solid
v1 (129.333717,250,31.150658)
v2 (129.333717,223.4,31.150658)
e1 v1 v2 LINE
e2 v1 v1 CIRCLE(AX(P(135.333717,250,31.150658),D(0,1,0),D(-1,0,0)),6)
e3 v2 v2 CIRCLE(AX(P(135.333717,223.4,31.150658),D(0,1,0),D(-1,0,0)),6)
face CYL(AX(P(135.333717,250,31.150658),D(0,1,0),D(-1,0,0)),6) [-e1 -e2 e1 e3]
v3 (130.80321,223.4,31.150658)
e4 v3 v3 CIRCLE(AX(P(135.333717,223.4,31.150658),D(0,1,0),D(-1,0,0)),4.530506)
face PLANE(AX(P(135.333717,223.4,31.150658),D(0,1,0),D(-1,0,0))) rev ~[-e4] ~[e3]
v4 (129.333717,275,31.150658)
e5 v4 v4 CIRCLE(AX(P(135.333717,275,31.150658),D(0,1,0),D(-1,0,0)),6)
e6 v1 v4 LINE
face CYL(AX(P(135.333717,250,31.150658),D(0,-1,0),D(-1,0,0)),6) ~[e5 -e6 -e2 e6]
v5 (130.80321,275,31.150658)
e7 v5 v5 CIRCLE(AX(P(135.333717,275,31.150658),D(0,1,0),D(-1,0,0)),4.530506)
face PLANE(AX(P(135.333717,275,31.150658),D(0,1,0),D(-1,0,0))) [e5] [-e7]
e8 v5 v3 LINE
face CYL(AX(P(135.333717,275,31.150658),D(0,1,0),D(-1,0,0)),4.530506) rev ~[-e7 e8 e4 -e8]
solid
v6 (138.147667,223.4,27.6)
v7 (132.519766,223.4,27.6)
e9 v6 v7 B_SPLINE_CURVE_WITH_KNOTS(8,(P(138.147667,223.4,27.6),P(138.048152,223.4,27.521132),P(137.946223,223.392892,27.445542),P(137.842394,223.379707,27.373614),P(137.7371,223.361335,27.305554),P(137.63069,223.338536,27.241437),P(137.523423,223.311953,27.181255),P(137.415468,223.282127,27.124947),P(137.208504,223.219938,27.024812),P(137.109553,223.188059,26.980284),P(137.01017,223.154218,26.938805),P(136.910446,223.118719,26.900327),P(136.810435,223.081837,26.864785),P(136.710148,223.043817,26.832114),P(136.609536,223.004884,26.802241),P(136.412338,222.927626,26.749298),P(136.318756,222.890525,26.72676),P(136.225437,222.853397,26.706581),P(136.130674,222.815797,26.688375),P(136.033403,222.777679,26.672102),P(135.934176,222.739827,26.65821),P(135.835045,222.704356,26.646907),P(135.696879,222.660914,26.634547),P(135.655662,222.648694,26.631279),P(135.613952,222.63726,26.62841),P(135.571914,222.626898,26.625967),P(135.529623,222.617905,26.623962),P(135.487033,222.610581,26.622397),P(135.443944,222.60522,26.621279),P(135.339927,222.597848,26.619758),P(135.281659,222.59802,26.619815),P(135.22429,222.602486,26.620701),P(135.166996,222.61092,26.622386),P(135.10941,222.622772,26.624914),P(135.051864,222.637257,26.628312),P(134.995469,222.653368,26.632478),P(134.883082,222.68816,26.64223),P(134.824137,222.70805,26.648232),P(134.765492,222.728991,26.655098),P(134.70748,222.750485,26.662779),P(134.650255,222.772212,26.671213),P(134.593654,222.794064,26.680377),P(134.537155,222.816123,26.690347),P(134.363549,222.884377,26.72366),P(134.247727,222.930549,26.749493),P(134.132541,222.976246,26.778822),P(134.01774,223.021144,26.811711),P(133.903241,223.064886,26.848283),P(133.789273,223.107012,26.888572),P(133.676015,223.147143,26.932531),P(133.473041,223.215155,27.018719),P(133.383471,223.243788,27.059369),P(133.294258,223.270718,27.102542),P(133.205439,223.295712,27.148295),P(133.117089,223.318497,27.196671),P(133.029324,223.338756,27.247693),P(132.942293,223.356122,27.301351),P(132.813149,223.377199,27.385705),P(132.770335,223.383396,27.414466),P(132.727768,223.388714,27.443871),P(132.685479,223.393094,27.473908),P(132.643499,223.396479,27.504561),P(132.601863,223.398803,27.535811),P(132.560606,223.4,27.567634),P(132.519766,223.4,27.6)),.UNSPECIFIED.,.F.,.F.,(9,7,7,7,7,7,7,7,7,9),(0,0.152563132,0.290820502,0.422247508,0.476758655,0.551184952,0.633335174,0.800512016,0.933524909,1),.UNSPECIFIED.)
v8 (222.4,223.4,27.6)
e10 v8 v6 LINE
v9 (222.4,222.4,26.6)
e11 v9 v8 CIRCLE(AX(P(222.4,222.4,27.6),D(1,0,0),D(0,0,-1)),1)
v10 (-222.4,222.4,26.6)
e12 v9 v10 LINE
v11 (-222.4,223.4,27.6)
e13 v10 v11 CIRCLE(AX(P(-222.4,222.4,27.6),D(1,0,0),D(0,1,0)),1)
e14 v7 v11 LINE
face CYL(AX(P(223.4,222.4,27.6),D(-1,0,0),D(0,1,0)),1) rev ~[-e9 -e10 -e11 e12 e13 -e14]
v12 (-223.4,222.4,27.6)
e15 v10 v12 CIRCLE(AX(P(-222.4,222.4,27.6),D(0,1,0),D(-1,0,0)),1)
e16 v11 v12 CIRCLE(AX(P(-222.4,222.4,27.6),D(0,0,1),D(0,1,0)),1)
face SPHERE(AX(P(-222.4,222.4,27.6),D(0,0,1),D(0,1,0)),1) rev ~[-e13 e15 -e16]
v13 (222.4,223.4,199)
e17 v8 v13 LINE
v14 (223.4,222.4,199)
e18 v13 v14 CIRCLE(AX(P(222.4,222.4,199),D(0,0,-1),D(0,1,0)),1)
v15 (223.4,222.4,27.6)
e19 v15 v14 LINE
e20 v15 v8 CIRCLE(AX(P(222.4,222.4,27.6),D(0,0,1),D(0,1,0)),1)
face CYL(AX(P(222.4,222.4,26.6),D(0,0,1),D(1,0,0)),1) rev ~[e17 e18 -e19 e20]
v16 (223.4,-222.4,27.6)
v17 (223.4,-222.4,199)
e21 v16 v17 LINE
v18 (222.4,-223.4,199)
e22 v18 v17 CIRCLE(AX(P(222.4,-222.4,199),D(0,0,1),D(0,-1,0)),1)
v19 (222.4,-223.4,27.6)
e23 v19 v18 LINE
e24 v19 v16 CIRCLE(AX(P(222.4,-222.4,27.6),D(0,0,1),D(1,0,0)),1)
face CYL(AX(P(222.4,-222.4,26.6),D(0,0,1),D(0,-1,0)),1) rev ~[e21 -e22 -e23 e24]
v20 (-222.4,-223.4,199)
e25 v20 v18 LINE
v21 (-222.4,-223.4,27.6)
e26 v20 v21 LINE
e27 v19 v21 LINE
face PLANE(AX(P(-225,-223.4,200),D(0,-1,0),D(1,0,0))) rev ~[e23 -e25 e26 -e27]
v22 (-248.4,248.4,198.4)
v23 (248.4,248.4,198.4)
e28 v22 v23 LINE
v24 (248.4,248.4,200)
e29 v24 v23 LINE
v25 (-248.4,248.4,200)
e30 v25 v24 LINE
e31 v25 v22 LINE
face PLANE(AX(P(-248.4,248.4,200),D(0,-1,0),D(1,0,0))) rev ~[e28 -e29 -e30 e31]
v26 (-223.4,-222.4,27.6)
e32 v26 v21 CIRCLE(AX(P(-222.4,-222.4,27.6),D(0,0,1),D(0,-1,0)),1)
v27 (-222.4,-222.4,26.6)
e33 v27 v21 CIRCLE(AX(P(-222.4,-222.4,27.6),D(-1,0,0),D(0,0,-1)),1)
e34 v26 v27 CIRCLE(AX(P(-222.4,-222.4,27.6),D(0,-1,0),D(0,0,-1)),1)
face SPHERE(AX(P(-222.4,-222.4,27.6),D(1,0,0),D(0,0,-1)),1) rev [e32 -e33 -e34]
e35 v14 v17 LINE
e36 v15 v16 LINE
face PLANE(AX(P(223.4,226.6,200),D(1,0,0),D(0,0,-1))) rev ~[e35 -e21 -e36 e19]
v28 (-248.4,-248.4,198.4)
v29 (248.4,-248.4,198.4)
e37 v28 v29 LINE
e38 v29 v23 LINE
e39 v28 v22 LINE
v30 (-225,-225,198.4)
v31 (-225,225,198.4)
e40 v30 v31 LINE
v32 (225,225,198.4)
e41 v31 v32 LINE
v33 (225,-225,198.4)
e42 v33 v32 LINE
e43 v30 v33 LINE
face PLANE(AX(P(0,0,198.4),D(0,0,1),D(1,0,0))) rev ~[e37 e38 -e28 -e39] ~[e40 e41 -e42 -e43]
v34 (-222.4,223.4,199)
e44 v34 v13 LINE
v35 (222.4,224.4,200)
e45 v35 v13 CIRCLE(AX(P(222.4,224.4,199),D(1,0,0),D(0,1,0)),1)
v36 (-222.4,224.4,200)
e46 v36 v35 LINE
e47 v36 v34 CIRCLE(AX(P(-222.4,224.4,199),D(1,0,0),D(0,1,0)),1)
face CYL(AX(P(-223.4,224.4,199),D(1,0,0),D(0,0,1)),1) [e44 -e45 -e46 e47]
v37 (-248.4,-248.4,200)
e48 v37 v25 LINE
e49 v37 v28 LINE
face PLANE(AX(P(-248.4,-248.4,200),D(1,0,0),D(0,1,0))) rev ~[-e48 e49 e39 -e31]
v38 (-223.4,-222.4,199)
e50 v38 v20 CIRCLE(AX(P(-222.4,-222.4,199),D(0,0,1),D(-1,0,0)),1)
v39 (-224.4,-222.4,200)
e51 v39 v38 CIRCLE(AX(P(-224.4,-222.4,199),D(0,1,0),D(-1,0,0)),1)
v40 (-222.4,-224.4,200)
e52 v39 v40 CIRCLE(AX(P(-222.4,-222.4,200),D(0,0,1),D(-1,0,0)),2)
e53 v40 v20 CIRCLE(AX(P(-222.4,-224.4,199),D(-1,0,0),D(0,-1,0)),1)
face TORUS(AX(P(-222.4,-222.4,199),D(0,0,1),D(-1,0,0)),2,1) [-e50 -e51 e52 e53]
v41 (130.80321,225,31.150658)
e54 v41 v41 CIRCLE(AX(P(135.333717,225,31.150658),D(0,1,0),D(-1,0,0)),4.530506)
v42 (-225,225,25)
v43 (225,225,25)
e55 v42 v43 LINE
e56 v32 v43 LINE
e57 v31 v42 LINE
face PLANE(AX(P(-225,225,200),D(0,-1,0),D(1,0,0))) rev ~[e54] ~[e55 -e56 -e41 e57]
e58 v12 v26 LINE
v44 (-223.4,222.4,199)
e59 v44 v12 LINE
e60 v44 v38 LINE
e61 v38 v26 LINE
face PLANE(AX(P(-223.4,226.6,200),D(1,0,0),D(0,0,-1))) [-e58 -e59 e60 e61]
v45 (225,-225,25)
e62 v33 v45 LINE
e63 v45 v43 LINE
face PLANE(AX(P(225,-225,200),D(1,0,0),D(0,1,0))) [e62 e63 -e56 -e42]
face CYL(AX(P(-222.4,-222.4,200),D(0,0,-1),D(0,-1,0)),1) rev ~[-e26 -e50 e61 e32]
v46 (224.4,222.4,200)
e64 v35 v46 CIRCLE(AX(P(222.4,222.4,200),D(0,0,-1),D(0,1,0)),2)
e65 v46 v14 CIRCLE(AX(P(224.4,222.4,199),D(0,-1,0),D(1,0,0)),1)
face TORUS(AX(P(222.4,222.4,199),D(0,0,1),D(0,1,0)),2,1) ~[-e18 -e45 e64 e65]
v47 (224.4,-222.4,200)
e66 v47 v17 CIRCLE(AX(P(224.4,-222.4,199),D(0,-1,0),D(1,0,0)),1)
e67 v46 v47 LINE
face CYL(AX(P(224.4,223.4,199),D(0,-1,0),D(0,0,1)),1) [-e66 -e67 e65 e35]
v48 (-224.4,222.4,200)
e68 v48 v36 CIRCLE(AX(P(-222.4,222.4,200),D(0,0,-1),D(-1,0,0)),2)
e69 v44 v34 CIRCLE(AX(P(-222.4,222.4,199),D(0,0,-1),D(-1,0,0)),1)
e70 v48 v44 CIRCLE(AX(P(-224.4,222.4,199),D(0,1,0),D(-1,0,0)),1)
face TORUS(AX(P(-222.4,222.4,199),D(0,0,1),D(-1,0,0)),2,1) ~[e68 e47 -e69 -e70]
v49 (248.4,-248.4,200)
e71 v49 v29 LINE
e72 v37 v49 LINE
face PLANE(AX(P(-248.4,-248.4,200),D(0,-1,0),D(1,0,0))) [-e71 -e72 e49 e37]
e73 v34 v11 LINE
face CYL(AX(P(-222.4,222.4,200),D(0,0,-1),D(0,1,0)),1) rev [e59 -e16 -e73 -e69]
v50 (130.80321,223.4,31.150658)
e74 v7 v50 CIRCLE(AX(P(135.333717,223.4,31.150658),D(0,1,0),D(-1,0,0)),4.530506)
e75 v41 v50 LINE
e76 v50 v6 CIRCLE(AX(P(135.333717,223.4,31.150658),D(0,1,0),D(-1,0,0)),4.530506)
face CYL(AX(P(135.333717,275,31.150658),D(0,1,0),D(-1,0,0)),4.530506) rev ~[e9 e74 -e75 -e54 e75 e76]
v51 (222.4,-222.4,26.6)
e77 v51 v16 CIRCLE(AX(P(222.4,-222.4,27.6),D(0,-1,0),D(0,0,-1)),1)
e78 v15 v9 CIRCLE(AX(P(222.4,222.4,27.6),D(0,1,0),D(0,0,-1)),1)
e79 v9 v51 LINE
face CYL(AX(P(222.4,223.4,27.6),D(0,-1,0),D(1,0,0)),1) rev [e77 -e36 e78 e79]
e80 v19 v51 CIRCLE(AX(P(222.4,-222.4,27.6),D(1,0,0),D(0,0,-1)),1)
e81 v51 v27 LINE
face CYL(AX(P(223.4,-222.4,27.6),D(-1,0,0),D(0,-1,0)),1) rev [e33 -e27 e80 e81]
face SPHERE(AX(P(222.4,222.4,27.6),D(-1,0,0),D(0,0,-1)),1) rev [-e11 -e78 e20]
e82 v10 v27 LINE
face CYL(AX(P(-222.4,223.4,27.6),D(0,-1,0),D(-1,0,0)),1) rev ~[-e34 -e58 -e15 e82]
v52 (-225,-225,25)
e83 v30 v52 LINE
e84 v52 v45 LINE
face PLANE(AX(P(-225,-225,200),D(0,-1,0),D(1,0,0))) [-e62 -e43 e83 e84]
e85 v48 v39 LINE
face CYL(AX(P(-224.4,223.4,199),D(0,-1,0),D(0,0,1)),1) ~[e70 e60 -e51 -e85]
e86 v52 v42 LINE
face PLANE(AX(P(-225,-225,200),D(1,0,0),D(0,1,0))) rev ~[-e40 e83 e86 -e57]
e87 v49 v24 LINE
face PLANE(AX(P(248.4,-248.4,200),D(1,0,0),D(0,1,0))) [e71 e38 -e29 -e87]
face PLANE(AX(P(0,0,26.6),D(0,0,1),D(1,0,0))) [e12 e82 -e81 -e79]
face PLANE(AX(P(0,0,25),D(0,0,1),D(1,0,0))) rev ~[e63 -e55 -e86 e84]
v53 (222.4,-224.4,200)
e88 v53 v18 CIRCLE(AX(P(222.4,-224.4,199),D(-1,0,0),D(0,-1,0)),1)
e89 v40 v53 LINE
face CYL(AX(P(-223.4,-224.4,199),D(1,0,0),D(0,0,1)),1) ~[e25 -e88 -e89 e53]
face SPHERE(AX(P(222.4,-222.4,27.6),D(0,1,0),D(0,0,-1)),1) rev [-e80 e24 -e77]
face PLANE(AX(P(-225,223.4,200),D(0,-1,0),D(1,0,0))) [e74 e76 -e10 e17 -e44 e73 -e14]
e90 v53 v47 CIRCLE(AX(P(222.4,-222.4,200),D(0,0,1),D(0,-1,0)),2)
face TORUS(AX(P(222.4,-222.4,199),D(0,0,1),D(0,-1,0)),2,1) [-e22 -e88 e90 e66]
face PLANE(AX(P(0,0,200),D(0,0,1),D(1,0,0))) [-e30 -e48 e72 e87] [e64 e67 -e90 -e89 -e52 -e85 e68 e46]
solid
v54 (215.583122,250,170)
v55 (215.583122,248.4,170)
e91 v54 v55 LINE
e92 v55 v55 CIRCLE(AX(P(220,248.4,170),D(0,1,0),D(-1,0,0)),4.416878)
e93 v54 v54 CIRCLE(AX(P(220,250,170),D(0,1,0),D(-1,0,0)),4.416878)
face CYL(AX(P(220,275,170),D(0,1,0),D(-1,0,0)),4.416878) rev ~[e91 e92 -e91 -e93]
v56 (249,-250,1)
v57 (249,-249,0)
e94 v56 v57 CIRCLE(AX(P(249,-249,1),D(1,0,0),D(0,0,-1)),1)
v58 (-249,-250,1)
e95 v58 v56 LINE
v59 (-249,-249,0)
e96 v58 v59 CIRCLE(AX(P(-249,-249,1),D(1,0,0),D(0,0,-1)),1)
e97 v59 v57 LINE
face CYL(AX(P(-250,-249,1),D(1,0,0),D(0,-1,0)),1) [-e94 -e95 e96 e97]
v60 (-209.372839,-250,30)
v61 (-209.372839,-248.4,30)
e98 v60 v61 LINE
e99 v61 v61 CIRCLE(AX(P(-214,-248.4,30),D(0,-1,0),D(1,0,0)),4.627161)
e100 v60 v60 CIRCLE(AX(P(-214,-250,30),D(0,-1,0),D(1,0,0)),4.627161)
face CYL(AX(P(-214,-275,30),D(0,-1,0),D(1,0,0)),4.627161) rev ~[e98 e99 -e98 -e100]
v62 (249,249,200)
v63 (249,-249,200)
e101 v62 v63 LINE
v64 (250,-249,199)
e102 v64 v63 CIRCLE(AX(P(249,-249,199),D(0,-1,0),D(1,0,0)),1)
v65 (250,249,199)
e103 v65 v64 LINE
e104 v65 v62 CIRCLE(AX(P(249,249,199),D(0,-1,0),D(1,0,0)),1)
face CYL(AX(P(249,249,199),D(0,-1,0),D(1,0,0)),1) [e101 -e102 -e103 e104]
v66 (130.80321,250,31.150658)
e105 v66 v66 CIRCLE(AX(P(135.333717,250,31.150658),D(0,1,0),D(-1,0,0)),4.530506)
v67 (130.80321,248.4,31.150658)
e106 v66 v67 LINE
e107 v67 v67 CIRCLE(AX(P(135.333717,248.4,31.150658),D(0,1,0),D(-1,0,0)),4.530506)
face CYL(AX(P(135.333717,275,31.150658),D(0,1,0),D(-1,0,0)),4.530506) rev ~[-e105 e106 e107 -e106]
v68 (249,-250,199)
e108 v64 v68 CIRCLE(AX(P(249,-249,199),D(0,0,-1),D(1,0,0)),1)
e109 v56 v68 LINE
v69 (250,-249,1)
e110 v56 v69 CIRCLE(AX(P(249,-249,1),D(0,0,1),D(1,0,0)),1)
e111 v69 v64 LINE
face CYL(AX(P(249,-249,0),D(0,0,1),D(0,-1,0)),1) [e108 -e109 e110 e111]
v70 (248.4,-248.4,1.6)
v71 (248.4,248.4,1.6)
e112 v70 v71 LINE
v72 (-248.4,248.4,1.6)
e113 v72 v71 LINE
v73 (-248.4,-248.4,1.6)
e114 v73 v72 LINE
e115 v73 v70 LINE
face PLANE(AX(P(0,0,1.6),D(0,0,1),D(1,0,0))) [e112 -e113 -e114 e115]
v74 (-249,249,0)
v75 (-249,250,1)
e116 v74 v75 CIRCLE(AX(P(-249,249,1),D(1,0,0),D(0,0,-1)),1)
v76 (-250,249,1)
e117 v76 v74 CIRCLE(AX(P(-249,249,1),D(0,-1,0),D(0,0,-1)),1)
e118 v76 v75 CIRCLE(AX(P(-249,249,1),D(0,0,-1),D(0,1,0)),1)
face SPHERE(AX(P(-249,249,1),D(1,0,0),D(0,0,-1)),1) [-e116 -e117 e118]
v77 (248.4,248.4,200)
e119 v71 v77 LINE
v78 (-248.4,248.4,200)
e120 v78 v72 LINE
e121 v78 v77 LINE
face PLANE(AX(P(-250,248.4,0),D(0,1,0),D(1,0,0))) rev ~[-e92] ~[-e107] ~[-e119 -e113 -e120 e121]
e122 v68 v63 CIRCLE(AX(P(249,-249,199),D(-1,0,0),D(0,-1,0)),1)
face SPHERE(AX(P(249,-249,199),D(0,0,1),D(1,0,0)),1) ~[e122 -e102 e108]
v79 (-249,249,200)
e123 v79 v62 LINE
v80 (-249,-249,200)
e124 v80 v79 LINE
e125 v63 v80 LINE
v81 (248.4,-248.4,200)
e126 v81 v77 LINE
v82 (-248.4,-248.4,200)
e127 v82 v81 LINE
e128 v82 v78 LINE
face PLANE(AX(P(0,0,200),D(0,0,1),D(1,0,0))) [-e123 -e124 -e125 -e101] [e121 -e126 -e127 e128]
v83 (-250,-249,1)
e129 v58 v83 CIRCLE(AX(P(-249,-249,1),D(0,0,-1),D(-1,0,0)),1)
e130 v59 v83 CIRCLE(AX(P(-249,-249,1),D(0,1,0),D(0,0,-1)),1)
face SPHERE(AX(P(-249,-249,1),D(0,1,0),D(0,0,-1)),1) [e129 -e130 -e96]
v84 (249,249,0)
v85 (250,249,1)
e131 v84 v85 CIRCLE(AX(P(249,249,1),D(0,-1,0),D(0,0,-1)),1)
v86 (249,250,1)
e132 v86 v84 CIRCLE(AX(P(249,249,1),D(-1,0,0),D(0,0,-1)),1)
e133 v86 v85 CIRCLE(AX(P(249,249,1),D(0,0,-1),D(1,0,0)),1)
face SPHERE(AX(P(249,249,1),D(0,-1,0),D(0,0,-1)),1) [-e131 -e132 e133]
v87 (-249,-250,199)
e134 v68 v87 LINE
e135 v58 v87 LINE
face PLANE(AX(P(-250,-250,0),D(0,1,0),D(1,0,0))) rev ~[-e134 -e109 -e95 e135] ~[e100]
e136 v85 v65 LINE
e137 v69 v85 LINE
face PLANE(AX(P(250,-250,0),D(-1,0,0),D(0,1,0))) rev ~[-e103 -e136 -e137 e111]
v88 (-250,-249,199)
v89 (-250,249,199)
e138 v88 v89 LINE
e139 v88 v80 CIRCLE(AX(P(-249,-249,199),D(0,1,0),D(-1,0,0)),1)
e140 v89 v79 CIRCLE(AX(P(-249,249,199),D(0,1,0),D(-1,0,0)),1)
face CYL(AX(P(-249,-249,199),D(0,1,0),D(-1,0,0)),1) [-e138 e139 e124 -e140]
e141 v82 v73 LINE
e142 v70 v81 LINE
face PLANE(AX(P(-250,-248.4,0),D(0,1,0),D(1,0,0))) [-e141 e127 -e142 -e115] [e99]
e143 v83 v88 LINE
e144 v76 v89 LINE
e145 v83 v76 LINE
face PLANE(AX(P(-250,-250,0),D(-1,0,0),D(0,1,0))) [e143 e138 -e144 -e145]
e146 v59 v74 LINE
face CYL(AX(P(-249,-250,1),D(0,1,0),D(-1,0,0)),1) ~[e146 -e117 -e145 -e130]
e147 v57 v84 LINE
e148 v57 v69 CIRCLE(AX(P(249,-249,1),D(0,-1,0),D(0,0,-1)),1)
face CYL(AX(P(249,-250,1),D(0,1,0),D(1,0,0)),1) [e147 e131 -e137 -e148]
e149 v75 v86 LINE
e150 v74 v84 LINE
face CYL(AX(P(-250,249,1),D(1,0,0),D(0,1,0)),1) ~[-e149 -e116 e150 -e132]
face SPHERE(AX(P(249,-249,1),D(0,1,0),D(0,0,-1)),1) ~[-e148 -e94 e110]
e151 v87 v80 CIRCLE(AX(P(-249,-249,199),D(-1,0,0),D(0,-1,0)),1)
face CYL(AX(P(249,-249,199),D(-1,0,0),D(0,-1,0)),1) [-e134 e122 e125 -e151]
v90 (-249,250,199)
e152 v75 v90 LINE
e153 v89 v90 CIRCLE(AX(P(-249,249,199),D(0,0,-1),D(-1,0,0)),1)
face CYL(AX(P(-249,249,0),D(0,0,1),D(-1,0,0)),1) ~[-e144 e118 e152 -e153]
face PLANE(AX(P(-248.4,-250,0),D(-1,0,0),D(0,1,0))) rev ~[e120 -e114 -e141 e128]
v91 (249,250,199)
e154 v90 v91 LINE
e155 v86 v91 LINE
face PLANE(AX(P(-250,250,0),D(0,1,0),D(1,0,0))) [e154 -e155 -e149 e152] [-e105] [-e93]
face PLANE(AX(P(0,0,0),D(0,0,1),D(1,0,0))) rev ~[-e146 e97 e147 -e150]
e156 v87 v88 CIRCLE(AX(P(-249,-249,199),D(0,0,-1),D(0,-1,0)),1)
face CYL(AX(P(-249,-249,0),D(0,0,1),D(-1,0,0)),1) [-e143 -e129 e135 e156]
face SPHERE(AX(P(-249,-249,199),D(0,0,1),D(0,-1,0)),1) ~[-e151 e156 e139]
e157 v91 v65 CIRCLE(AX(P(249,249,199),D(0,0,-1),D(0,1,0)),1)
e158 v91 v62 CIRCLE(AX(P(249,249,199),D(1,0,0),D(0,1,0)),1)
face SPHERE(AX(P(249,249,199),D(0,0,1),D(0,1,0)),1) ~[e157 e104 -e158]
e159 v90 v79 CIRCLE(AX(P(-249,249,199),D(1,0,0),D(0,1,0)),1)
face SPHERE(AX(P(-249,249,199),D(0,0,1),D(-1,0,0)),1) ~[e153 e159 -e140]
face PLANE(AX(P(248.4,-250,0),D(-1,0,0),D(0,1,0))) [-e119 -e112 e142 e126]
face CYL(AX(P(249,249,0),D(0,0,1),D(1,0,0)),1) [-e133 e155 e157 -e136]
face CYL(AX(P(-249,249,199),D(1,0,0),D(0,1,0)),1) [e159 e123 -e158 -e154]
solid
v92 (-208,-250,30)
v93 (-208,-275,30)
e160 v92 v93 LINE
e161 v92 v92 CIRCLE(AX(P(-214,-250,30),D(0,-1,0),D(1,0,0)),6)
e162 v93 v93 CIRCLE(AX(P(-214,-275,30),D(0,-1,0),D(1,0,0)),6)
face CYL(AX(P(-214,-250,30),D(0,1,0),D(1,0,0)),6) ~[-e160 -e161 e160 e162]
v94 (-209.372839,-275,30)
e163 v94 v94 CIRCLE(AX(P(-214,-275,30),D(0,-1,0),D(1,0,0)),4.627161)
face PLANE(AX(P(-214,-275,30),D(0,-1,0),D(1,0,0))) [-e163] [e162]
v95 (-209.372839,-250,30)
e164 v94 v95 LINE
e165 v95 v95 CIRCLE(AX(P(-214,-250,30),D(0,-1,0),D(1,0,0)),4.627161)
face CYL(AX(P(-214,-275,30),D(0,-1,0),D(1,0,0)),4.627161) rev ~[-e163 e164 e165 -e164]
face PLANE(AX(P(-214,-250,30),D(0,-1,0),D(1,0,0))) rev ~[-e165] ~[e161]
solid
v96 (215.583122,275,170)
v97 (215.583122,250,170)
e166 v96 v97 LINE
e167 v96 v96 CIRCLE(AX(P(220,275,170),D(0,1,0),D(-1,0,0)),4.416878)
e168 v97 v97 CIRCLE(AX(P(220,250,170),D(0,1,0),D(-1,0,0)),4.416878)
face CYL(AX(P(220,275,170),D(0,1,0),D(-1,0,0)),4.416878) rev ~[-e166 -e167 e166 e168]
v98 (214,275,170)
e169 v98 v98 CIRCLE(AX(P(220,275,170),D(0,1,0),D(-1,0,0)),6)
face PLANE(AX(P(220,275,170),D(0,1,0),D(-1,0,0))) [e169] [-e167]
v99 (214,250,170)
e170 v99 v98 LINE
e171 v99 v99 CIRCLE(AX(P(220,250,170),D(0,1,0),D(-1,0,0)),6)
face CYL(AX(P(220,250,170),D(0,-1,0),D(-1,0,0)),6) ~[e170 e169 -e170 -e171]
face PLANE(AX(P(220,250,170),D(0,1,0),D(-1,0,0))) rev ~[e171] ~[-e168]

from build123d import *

# Parameters (mm, degrees)
F0_W           = 500
F0_H           = 500
F1_DEPTH       = 200
F2_R           = 1
F3_T           = -1.6
F4_W           = 496.8
F4_H           = 496.8
F4_W_2         = 450
F4_H_2         = 450
F5_DEPTH       = 1.6
F6_W           = 450
F6_H           = 450
F7_DEPTH       = 175
F8_T           = 1.6
F8_T3_DEPTH    = 453.2
F8_T5_DEPTH    = 453.2
F9_R           = 1
F9_2_R         = 1
F10_R          = 6
F11_DEPTH      = 25
F12_R          = 6
F13_DEPTH      = 25
F14_R          = 4.6271608876
F15_DEPTH      = 30
F16_R          = 4.4168784141
F17_DEPTH      = 30
F18_R          = 6
F19_DEPTH      = 26.6
F19_DEPTH_BACK = 25
F20_R          = 4.5305063865
F21_DEPTH      = 70


# Not quite as in the source:
# - a shell that OpenCascade refuses in one call is made with other operations: the cavity is built on its own and cut out


with BuildPart() as f1:
    # F0 (on Top) → F1 (new body)
    with BuildSketch(Plane.XY):
        Rectangle(F0_W, F0_H)
    extrude(amount=F1_DEPTH)

    # F2
    f2_edges = [f1.edges().sort_by_distance(p)[0] for p in [
        (250, 0, 0),
        (0, 250, 0),
        (-250, 0, 0),
        (0, -250, 0),
        (250, -250, 100),
        (-250, -250, 100),
        (-250, 250, 100),
        (250, 250, 100),
    ]]
    fillet(f2_edges, radius=F2_R)

    # F3
    f3_openings = [f1.faces().sort_by_distance(p)[0] for p in [
        (0, 0, 200),
    ]]
    offset(amount=F3_T, openings=f3_openings)

    # F9#2
    f9_2_edges = [f1.edges().sort_by_distance(p)[0] for p in [
        (-250, 0, 200),
        (0, -250, 200),
        (250, 0, 200),
        (0, 250, 200),
    ]]
    fillet(f9_2_edges, radius=F9_2_R)


with BuildPart() as f5:
    # F4 (on face) → F5 (new body)
    with BuildSketch(Plane.XY.offset(200)):
        Rectangle(F4_W, F4_H)
        Rectangle(F4_W_2, F4_H_2, mode=Mode.SUBTRACT)
    extrude(amount=-F5_DEPTH)

    # F6 (on face) → F7 (join)
    with BuildSketch(Plane.XY.offset(200)):
        Rectangle(F6_W, F6_H)
    extrude(amount=-F7_DEPTH)

    # F8: shell of thickness 1.6, made by hand


with BuildPart() as f8_core1:
    # F8_t2: copy of F5
    add(f5.part)

    # the walls: a layer under each face that stays
    f8_faces = [f8_core1.faces().sort_by_distance(p)[0] for p in [
        (248.4, 0, 199.2),
        (0, -248.4, 199.2),
        (0, 248.4, 199.2),
        (-231.84, -231.84, 198.4),
        (-248.4, 0, 199.2),
        (-225, 0, 111.7),
        (0, 225, 111.7),
        (225, 0, 111.7),
        (0, -225, 111.7),
        (0, 0, 25),
    ]]
    thicken(f8_faces, amount=-F8_T, mode=Mode.SUBTRACT)

    # F8_s4 → F8_t3 (cut)
    with BuildSketch(Plane.XZ.offset(-226.6)):
        Polygon((-225.016, 198.384), (-225, 200), (-223.4, 200), (-223.4, 198.4), align=None)
        Polygon((225.016, 198.384), (225, 200), (223.4, 200), (223.4, 198.4), align=None)
    extrude(amount=F8_T3_DEPTH, mode=Mode.SUBTRACT)

    # F8_s6 → F8_t5 (cut)
    with BuildSketch(Plane.YZ.offset(-226.6)):
        Polygon((225.016, 198.384), (225, 200), (223.4, 200), (223.4, 198.4), align=None)
        Polygon((-225.016, 198.384), (-225, 200), (-223.4, 200), (-223.4, 198.4), align=None)
    extrude(amount=F8_T5_DEPTH, mode=Mode.SUBTRACT)


with BuildPart() as f5_1:
    add(f5.part)

    # what is left inside the walls is the cavity
    f8_cavity = [f8_core1.part.solids().sort_by_distance(p)[0] for p in [
        (0, -74.466667, 199.984),
    ]]
    add(f8_cavity, mode=Mode.SUBTRACT)

    # F9
    f9_edges = [f5_1.edges().sort_by_distance(p)[0] for p in [
        (-223.4, 0, 200),
        (0, -223.4, 200),
        (0, 223.4, 200),
        (223.4, 0, 200),
        (-223.4, 223.4, 113.3),
        (0, 223.4, 26.6),
        (223.4, 0, 26.6),
        (0, -223.4, 26.6),
        (-223.4, 0, 26.6),
        (223.4, -223.4, 113.3),
        (-223.4, -223.4, 113.3),
        (223.4, 223.4, 113.3),
    ]]
    fillet(f9_edges, radius=F9_R)


with BuildPart() as f11:
    # F10 (on face) → F11 (new body)
    with BuildSketch(Plane(origin=(0, 250, 0), x_dir=(-1, 0, 0), z_dir=(0, 1, 0))):
        with Locations((-220, 170)):
            Circle(F10_R)
    extrude(amount=F11_DEPTH)


with BuildPart() as f13:
    # F12 (on face) → F13 (new body)
    with BuildSketch(Plane.XZ.offset(250)):
        with Locations((-214, 30)):
            Circle(F12_R)
    extrude(amount=F13_DEPTH)


with BuildPart() as f15_tool:
    # F14 (on face) → F15 (new body)
    with BuildSketch(Plane.XZ.offset(275)):
        with Locations((-214, 30)):
            Circle(F14_R)
    extrude(amount=-F15_DEPTH)


with BuildPart() as f1_1:
    add(f1.part)

    # F15: cut by f15_tool
    add(f15_tool.part, mode=Mode.SUBTRACT)


with BuildPart() as f13_1:
    add(f13.part)

    # F15: cut by f15_tool
    add(f15_tool.part, mode=Mode.SUBTRACT)


with BuildPart() as f17_tool:
    # F16 (on face) → F17 (new body)
    with BuildSketch(Plane(origin=(0, 275, 0), x_dir=(-1, 0, 0), z_dir=(0, 1, 0))):
        with Locations((-220, 170)):
            Circle(F16_R)
    extrude(amount=-F17_DEPTH)


with BuildPart() as f1_2:
    add(f1_1.part)

    # F17: cut by f17_tool
    add(f17_tool.part, mode=Mode.SUBTRACT)


with BuildPart() as f11_1:
    add(f11.part)

    # F17: cut by f17_tool
    add(f17_tool.part, mode=Mode.SUBTRACT)


with BuildPart() as f19:
    # F18 (on face) → F19 (new body, two sides)
    with BuildSketch(Plane(origin=(0, 250, 0), x_dir=(-1, 0, 0), z_dir=(0, 1, 0))) as f19_sk:
        with Locations((-135.3337168694, 31.1506576836)):
            Circle(F18_R)
    extrude(amount=-F19_DEPTH)
    extrude(f19_sk.sketch, amount=F19_DEPTH_BACK)


with BuildPart() as f21_tool:
    # F20 (on face) → F21 (new body)
    with BuildSketch(Plane(origin=(0, 275, 0), x_dir=(-1, 0, 0), z_dir=(0, 1, 0))):
        with Locations((-135.3337168694, 31.1506576836)):
            Circle(F20_R)
    extrude(amount=-F21_DEPTH)


with BuildPart() as f1_3:
    add(f1_2.part)

    # F21: cut by f21_tool
    add(f21_tool.part, mode=Mode.SUBTRACT)


with BuildPart() as f5_2:
    add(f5_1.part)

    # F21: cut by f21_tool
    add(f21_tool.part, mode=Mode.SUBTRACT)


with BuildPart() as f19_1:
    add(f19.part)

    # F21: cut by f21_tool
    add(f21_tool.part, mode=Mode.SUBTRACT)


solid = Compound([f13_1.part, f11_1.part, f1_3.part, f5_2.part, f19_1.part])
